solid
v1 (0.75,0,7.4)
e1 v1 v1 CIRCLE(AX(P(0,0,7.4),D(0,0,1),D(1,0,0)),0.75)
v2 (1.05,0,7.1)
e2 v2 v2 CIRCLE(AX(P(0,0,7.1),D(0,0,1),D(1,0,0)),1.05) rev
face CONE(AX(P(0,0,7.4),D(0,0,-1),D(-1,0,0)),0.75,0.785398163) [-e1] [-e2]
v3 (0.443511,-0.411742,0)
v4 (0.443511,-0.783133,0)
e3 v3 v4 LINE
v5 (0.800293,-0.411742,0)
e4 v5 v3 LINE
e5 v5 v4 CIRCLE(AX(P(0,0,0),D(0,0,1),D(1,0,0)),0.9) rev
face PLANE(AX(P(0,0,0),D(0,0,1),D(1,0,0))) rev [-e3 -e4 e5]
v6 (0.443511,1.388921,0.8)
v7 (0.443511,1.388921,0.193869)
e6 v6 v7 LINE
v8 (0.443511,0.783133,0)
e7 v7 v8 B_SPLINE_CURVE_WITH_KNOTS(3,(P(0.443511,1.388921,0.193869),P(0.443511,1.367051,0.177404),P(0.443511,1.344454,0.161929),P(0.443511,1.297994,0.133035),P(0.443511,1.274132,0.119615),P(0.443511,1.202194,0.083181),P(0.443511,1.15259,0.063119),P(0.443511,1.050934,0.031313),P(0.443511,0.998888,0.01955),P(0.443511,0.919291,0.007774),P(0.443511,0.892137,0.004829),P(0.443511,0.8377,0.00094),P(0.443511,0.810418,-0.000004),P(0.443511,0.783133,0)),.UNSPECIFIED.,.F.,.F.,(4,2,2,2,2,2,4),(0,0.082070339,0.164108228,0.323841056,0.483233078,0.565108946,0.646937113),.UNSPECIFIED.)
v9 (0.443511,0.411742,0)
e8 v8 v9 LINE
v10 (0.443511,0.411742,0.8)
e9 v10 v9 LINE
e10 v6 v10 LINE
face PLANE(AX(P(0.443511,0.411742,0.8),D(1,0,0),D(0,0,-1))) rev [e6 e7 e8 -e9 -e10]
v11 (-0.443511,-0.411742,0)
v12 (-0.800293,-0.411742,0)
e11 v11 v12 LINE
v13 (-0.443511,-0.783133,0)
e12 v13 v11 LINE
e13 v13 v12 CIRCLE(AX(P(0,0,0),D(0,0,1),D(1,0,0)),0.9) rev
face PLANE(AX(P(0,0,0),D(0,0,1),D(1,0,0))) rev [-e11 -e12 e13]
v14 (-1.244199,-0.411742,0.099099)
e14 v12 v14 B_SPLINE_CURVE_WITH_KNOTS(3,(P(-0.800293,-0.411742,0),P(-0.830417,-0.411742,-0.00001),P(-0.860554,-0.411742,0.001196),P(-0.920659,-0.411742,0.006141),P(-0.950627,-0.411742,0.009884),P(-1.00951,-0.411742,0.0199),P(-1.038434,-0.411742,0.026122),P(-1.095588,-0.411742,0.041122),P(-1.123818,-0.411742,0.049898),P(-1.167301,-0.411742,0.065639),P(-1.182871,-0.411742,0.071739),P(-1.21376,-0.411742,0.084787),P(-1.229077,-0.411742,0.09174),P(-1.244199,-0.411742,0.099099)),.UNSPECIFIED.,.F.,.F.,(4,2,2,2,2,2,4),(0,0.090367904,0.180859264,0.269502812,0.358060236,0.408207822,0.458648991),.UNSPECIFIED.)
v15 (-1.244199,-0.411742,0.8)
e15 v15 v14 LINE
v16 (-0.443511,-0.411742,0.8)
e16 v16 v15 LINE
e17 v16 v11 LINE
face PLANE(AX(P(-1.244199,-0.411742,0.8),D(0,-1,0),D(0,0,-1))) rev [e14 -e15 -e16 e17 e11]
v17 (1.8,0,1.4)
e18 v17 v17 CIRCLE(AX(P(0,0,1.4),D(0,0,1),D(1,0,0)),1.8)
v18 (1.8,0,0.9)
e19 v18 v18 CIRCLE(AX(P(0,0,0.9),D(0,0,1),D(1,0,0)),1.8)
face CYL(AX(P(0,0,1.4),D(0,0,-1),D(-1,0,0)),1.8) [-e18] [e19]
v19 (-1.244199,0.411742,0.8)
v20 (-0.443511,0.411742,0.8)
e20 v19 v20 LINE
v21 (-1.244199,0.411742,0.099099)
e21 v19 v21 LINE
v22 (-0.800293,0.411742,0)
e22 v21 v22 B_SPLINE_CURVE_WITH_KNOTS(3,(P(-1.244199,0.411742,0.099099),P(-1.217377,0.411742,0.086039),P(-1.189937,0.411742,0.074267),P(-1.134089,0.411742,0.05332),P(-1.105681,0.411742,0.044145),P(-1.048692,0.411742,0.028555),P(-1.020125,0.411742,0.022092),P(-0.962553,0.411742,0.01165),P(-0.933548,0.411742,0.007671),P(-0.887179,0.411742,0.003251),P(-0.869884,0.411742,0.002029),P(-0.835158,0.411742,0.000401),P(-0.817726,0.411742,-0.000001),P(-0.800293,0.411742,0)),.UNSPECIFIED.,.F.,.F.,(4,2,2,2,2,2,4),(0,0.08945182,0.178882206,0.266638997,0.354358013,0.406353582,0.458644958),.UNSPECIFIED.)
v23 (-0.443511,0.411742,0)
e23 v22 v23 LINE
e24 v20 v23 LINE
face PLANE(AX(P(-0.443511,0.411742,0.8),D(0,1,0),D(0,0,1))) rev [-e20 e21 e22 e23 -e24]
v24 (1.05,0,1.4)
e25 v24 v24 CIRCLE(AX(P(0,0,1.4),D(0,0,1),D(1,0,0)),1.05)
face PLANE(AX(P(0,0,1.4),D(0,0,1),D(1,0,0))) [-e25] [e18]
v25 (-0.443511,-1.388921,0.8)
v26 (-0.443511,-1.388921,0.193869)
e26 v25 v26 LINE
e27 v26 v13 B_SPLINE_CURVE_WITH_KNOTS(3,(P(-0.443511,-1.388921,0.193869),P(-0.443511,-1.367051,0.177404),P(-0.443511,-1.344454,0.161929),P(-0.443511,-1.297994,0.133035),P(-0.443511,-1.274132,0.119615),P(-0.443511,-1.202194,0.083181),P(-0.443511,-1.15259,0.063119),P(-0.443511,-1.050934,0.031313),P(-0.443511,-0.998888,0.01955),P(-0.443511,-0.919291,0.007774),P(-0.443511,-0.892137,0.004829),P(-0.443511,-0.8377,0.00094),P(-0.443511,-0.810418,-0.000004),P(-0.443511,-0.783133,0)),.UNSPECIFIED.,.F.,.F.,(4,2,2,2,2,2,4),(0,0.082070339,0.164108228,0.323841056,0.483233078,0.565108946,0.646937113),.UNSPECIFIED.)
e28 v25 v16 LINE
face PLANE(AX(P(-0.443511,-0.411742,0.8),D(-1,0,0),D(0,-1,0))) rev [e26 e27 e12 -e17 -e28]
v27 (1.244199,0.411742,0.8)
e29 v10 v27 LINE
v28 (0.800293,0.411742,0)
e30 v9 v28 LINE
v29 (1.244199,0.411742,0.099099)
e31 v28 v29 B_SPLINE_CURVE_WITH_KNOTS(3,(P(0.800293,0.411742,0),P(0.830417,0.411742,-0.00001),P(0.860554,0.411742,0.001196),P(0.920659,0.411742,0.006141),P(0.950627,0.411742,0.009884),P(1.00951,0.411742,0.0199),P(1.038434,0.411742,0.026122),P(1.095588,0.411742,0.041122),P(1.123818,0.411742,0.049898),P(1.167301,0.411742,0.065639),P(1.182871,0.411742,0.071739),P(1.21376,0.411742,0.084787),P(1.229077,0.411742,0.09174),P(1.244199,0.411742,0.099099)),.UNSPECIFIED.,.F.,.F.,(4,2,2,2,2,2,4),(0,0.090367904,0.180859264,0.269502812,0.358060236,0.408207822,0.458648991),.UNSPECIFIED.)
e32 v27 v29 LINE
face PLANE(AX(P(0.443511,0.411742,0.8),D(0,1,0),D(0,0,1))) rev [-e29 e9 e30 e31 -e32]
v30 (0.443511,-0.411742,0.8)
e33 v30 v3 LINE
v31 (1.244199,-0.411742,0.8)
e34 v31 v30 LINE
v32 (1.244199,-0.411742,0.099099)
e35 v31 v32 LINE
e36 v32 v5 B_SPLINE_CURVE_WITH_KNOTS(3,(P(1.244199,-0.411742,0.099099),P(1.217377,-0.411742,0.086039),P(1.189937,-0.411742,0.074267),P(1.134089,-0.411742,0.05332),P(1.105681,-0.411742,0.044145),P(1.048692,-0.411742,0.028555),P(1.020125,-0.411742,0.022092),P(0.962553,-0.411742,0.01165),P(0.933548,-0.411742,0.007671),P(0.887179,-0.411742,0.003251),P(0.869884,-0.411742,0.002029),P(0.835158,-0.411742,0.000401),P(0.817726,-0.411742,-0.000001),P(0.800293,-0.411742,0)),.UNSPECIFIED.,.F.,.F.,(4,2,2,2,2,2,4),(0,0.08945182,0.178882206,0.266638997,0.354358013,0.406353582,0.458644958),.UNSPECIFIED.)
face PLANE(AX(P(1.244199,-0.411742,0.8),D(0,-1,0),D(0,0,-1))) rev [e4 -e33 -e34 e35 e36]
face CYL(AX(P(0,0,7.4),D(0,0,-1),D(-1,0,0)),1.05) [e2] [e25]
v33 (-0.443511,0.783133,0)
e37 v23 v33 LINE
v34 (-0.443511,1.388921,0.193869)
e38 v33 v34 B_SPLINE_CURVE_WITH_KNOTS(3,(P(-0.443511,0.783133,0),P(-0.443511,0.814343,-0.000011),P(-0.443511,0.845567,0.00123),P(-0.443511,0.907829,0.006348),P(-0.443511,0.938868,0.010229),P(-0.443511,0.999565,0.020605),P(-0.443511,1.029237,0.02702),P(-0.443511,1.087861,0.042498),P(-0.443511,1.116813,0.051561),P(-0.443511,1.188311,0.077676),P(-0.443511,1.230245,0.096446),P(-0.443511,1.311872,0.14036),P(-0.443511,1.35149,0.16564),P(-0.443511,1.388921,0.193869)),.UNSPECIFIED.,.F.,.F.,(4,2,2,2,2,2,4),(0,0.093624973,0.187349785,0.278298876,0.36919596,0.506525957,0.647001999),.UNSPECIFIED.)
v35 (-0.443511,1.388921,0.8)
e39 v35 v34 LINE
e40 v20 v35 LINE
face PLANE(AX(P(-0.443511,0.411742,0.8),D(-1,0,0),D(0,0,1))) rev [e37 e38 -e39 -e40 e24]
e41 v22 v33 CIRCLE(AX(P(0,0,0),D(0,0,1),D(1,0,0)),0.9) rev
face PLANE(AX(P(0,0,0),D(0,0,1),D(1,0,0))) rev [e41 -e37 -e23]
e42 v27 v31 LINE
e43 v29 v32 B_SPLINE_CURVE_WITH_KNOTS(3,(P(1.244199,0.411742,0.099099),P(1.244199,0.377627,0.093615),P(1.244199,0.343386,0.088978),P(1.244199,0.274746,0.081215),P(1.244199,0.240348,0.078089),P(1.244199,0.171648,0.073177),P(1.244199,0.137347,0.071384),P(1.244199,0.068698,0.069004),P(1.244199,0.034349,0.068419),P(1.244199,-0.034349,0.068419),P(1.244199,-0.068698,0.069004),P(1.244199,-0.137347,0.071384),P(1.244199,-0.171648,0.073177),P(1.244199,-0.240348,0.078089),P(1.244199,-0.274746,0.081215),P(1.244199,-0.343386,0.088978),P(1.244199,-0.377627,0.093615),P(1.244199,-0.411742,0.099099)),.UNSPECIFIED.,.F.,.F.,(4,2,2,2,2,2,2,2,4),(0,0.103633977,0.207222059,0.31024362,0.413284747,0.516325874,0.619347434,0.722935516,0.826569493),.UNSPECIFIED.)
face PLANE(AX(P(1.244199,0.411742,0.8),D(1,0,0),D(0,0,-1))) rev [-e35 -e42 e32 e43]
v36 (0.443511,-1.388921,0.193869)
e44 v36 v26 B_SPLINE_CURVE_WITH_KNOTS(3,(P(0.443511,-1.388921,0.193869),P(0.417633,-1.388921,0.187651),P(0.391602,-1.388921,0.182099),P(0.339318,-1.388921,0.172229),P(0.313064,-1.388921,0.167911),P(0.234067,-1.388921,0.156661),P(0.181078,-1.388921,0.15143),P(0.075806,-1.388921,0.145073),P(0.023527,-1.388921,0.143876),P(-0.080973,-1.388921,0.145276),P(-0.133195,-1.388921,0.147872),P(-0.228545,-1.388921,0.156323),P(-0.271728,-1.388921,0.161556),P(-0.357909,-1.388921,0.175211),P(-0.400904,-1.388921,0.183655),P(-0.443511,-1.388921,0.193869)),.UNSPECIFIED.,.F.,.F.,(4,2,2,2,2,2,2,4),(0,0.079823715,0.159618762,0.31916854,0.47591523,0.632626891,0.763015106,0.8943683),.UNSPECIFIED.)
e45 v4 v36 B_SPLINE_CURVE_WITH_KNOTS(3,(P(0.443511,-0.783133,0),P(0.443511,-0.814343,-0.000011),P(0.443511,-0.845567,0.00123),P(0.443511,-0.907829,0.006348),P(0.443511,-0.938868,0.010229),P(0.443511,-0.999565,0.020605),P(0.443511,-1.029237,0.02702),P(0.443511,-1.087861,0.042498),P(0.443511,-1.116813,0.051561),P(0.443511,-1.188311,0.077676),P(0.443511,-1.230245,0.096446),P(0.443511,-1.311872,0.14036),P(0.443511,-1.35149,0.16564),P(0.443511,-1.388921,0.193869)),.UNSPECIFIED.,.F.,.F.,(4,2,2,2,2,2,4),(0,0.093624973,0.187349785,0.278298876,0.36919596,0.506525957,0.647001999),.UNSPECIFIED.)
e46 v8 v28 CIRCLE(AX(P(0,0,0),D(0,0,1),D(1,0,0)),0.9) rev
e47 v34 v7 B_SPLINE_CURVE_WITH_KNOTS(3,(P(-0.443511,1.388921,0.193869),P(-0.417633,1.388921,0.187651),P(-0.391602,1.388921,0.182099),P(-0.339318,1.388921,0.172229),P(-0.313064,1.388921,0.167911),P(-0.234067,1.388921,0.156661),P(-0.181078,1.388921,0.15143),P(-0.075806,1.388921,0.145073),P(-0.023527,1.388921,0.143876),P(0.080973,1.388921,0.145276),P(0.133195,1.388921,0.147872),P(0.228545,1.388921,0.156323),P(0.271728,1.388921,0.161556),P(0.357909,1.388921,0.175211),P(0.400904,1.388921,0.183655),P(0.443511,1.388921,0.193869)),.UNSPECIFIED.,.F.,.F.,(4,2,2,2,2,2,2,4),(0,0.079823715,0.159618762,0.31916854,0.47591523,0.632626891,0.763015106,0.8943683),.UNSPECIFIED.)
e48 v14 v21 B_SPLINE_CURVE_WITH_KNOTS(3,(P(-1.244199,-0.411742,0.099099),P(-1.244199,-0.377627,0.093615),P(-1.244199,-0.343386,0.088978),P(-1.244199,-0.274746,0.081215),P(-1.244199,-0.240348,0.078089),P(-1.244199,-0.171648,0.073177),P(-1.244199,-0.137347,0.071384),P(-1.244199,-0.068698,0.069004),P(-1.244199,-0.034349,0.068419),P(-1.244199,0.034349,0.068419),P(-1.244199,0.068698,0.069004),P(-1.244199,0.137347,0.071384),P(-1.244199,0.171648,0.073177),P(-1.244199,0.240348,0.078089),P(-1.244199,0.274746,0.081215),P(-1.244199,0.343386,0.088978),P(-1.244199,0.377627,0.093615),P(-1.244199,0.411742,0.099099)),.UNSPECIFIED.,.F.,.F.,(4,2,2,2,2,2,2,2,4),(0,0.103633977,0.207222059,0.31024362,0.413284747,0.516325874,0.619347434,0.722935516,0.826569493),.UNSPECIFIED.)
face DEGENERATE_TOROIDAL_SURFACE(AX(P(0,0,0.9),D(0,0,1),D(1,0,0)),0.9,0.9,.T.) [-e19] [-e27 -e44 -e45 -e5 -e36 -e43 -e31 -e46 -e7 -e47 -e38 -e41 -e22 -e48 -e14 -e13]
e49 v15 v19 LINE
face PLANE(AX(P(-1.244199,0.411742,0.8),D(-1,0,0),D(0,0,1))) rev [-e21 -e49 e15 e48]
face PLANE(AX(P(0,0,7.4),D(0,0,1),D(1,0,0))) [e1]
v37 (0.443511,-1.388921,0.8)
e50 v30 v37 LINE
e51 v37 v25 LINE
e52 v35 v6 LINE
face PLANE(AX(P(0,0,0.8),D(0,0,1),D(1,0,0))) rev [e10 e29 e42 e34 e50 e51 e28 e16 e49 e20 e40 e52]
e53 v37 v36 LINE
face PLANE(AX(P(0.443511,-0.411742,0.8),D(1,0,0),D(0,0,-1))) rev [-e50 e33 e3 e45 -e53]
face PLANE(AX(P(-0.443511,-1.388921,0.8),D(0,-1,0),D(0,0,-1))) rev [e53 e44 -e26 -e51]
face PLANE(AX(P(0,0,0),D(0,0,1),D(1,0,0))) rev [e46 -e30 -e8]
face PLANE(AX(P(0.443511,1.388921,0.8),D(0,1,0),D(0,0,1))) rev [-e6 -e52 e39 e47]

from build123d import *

# Parameters (mm, degrees)
SKICA1_R                 = 1.8
P_IDAT_VYSUNUT_M1_DEPTH  = 1.4
ODEBRAT_VYSUNUT_M1_DEPTH = 0.8
SKICA4_R                 = 1.05
P_IDAT_VYSUNUT_M2_DEPTH  = 6
ZKOSEN_1_SIZE            = 0.3
ZAOBLIT1_R               = 0.9


with BuildPart() as part:
    # Skica1 → Přidat vysunutím1 (new body)
    with BuildSketch(Plane.XY):
        Circle(SKICA1_R)
    extrude(amount=P_IDAT_VYSUNUT_M1_DEPTH)

    # Skica2 → Odebrat vysunutím1 (cut)
    with BuildSketch(Plane(origin=(0, 0, 0), x_dir=(-1, 0, 0), z_dir=(0, 0, -1))):
        Polygon((-0.443511417, 0.411741974), (-1.244198575, 0.411741974), (-1.244198575, -0.411741974), (-0.443511417, -0.411741974), (-0.443511417, -1.388921302), (0, -1.388921302), (0.443511417, -1.388921302), (0.443511417, -0.411741974), (1.244198575, -0.411741974), (1.244198575, 0.411741974), (0.443511417, 0.411741974), (0.443511417, 1.388921302), (0, 1.388921302), (-0.443511417, 1.388921302), align=None)
    extrude(amount=-ODEBRAT_VYSUNUT_M1_DEPTH, mode=Mode.SUBTRACT)

    # Skica4 → Přidat vysunutím2 (add)
    with BuildSketch(Plane.XY.offset(1.4)):
        Circle(SKICA4_R)
    extrude(amount=P_IDAT_VYSUNUT_M2_DEPTH)

    # Zkosení1
    zkosen_1_edges = [part.edges().sort_by_distance(p)[0] for p in [
        (-1.05, 0, 7.4),
    ]]
    chamfer(zkosen_1_edges, length=ZKOSEN_1_SIZE)

    # Zaoblit1
    # the kernel refuses this fillet: 0.9 mm, written as the material it takes off along each edge
    with BuildSketch(Plane(origin=(0, 0, 0), x_dir=(1, 0, 0), z_dir=(0, -1, 0))) as zaoblit1_piece_1:
        with BuildLine():
            CenterArc((1.8 - ZAOBLIT1_R, ZAOBLIT1_R), ZAOBLIT1_R, 270, 90)
            Line((1.8 - ZAOBLIT1_R, 0), (1.8, 0))
            Line((1.8, 0), (1.8, ZAOBLIT1_R))
        make_face()
    revolve(axis=Axis((0, 0, 0), (0, 0, 1)), mode=Mode.SUBTRACT)


solid = part.part
